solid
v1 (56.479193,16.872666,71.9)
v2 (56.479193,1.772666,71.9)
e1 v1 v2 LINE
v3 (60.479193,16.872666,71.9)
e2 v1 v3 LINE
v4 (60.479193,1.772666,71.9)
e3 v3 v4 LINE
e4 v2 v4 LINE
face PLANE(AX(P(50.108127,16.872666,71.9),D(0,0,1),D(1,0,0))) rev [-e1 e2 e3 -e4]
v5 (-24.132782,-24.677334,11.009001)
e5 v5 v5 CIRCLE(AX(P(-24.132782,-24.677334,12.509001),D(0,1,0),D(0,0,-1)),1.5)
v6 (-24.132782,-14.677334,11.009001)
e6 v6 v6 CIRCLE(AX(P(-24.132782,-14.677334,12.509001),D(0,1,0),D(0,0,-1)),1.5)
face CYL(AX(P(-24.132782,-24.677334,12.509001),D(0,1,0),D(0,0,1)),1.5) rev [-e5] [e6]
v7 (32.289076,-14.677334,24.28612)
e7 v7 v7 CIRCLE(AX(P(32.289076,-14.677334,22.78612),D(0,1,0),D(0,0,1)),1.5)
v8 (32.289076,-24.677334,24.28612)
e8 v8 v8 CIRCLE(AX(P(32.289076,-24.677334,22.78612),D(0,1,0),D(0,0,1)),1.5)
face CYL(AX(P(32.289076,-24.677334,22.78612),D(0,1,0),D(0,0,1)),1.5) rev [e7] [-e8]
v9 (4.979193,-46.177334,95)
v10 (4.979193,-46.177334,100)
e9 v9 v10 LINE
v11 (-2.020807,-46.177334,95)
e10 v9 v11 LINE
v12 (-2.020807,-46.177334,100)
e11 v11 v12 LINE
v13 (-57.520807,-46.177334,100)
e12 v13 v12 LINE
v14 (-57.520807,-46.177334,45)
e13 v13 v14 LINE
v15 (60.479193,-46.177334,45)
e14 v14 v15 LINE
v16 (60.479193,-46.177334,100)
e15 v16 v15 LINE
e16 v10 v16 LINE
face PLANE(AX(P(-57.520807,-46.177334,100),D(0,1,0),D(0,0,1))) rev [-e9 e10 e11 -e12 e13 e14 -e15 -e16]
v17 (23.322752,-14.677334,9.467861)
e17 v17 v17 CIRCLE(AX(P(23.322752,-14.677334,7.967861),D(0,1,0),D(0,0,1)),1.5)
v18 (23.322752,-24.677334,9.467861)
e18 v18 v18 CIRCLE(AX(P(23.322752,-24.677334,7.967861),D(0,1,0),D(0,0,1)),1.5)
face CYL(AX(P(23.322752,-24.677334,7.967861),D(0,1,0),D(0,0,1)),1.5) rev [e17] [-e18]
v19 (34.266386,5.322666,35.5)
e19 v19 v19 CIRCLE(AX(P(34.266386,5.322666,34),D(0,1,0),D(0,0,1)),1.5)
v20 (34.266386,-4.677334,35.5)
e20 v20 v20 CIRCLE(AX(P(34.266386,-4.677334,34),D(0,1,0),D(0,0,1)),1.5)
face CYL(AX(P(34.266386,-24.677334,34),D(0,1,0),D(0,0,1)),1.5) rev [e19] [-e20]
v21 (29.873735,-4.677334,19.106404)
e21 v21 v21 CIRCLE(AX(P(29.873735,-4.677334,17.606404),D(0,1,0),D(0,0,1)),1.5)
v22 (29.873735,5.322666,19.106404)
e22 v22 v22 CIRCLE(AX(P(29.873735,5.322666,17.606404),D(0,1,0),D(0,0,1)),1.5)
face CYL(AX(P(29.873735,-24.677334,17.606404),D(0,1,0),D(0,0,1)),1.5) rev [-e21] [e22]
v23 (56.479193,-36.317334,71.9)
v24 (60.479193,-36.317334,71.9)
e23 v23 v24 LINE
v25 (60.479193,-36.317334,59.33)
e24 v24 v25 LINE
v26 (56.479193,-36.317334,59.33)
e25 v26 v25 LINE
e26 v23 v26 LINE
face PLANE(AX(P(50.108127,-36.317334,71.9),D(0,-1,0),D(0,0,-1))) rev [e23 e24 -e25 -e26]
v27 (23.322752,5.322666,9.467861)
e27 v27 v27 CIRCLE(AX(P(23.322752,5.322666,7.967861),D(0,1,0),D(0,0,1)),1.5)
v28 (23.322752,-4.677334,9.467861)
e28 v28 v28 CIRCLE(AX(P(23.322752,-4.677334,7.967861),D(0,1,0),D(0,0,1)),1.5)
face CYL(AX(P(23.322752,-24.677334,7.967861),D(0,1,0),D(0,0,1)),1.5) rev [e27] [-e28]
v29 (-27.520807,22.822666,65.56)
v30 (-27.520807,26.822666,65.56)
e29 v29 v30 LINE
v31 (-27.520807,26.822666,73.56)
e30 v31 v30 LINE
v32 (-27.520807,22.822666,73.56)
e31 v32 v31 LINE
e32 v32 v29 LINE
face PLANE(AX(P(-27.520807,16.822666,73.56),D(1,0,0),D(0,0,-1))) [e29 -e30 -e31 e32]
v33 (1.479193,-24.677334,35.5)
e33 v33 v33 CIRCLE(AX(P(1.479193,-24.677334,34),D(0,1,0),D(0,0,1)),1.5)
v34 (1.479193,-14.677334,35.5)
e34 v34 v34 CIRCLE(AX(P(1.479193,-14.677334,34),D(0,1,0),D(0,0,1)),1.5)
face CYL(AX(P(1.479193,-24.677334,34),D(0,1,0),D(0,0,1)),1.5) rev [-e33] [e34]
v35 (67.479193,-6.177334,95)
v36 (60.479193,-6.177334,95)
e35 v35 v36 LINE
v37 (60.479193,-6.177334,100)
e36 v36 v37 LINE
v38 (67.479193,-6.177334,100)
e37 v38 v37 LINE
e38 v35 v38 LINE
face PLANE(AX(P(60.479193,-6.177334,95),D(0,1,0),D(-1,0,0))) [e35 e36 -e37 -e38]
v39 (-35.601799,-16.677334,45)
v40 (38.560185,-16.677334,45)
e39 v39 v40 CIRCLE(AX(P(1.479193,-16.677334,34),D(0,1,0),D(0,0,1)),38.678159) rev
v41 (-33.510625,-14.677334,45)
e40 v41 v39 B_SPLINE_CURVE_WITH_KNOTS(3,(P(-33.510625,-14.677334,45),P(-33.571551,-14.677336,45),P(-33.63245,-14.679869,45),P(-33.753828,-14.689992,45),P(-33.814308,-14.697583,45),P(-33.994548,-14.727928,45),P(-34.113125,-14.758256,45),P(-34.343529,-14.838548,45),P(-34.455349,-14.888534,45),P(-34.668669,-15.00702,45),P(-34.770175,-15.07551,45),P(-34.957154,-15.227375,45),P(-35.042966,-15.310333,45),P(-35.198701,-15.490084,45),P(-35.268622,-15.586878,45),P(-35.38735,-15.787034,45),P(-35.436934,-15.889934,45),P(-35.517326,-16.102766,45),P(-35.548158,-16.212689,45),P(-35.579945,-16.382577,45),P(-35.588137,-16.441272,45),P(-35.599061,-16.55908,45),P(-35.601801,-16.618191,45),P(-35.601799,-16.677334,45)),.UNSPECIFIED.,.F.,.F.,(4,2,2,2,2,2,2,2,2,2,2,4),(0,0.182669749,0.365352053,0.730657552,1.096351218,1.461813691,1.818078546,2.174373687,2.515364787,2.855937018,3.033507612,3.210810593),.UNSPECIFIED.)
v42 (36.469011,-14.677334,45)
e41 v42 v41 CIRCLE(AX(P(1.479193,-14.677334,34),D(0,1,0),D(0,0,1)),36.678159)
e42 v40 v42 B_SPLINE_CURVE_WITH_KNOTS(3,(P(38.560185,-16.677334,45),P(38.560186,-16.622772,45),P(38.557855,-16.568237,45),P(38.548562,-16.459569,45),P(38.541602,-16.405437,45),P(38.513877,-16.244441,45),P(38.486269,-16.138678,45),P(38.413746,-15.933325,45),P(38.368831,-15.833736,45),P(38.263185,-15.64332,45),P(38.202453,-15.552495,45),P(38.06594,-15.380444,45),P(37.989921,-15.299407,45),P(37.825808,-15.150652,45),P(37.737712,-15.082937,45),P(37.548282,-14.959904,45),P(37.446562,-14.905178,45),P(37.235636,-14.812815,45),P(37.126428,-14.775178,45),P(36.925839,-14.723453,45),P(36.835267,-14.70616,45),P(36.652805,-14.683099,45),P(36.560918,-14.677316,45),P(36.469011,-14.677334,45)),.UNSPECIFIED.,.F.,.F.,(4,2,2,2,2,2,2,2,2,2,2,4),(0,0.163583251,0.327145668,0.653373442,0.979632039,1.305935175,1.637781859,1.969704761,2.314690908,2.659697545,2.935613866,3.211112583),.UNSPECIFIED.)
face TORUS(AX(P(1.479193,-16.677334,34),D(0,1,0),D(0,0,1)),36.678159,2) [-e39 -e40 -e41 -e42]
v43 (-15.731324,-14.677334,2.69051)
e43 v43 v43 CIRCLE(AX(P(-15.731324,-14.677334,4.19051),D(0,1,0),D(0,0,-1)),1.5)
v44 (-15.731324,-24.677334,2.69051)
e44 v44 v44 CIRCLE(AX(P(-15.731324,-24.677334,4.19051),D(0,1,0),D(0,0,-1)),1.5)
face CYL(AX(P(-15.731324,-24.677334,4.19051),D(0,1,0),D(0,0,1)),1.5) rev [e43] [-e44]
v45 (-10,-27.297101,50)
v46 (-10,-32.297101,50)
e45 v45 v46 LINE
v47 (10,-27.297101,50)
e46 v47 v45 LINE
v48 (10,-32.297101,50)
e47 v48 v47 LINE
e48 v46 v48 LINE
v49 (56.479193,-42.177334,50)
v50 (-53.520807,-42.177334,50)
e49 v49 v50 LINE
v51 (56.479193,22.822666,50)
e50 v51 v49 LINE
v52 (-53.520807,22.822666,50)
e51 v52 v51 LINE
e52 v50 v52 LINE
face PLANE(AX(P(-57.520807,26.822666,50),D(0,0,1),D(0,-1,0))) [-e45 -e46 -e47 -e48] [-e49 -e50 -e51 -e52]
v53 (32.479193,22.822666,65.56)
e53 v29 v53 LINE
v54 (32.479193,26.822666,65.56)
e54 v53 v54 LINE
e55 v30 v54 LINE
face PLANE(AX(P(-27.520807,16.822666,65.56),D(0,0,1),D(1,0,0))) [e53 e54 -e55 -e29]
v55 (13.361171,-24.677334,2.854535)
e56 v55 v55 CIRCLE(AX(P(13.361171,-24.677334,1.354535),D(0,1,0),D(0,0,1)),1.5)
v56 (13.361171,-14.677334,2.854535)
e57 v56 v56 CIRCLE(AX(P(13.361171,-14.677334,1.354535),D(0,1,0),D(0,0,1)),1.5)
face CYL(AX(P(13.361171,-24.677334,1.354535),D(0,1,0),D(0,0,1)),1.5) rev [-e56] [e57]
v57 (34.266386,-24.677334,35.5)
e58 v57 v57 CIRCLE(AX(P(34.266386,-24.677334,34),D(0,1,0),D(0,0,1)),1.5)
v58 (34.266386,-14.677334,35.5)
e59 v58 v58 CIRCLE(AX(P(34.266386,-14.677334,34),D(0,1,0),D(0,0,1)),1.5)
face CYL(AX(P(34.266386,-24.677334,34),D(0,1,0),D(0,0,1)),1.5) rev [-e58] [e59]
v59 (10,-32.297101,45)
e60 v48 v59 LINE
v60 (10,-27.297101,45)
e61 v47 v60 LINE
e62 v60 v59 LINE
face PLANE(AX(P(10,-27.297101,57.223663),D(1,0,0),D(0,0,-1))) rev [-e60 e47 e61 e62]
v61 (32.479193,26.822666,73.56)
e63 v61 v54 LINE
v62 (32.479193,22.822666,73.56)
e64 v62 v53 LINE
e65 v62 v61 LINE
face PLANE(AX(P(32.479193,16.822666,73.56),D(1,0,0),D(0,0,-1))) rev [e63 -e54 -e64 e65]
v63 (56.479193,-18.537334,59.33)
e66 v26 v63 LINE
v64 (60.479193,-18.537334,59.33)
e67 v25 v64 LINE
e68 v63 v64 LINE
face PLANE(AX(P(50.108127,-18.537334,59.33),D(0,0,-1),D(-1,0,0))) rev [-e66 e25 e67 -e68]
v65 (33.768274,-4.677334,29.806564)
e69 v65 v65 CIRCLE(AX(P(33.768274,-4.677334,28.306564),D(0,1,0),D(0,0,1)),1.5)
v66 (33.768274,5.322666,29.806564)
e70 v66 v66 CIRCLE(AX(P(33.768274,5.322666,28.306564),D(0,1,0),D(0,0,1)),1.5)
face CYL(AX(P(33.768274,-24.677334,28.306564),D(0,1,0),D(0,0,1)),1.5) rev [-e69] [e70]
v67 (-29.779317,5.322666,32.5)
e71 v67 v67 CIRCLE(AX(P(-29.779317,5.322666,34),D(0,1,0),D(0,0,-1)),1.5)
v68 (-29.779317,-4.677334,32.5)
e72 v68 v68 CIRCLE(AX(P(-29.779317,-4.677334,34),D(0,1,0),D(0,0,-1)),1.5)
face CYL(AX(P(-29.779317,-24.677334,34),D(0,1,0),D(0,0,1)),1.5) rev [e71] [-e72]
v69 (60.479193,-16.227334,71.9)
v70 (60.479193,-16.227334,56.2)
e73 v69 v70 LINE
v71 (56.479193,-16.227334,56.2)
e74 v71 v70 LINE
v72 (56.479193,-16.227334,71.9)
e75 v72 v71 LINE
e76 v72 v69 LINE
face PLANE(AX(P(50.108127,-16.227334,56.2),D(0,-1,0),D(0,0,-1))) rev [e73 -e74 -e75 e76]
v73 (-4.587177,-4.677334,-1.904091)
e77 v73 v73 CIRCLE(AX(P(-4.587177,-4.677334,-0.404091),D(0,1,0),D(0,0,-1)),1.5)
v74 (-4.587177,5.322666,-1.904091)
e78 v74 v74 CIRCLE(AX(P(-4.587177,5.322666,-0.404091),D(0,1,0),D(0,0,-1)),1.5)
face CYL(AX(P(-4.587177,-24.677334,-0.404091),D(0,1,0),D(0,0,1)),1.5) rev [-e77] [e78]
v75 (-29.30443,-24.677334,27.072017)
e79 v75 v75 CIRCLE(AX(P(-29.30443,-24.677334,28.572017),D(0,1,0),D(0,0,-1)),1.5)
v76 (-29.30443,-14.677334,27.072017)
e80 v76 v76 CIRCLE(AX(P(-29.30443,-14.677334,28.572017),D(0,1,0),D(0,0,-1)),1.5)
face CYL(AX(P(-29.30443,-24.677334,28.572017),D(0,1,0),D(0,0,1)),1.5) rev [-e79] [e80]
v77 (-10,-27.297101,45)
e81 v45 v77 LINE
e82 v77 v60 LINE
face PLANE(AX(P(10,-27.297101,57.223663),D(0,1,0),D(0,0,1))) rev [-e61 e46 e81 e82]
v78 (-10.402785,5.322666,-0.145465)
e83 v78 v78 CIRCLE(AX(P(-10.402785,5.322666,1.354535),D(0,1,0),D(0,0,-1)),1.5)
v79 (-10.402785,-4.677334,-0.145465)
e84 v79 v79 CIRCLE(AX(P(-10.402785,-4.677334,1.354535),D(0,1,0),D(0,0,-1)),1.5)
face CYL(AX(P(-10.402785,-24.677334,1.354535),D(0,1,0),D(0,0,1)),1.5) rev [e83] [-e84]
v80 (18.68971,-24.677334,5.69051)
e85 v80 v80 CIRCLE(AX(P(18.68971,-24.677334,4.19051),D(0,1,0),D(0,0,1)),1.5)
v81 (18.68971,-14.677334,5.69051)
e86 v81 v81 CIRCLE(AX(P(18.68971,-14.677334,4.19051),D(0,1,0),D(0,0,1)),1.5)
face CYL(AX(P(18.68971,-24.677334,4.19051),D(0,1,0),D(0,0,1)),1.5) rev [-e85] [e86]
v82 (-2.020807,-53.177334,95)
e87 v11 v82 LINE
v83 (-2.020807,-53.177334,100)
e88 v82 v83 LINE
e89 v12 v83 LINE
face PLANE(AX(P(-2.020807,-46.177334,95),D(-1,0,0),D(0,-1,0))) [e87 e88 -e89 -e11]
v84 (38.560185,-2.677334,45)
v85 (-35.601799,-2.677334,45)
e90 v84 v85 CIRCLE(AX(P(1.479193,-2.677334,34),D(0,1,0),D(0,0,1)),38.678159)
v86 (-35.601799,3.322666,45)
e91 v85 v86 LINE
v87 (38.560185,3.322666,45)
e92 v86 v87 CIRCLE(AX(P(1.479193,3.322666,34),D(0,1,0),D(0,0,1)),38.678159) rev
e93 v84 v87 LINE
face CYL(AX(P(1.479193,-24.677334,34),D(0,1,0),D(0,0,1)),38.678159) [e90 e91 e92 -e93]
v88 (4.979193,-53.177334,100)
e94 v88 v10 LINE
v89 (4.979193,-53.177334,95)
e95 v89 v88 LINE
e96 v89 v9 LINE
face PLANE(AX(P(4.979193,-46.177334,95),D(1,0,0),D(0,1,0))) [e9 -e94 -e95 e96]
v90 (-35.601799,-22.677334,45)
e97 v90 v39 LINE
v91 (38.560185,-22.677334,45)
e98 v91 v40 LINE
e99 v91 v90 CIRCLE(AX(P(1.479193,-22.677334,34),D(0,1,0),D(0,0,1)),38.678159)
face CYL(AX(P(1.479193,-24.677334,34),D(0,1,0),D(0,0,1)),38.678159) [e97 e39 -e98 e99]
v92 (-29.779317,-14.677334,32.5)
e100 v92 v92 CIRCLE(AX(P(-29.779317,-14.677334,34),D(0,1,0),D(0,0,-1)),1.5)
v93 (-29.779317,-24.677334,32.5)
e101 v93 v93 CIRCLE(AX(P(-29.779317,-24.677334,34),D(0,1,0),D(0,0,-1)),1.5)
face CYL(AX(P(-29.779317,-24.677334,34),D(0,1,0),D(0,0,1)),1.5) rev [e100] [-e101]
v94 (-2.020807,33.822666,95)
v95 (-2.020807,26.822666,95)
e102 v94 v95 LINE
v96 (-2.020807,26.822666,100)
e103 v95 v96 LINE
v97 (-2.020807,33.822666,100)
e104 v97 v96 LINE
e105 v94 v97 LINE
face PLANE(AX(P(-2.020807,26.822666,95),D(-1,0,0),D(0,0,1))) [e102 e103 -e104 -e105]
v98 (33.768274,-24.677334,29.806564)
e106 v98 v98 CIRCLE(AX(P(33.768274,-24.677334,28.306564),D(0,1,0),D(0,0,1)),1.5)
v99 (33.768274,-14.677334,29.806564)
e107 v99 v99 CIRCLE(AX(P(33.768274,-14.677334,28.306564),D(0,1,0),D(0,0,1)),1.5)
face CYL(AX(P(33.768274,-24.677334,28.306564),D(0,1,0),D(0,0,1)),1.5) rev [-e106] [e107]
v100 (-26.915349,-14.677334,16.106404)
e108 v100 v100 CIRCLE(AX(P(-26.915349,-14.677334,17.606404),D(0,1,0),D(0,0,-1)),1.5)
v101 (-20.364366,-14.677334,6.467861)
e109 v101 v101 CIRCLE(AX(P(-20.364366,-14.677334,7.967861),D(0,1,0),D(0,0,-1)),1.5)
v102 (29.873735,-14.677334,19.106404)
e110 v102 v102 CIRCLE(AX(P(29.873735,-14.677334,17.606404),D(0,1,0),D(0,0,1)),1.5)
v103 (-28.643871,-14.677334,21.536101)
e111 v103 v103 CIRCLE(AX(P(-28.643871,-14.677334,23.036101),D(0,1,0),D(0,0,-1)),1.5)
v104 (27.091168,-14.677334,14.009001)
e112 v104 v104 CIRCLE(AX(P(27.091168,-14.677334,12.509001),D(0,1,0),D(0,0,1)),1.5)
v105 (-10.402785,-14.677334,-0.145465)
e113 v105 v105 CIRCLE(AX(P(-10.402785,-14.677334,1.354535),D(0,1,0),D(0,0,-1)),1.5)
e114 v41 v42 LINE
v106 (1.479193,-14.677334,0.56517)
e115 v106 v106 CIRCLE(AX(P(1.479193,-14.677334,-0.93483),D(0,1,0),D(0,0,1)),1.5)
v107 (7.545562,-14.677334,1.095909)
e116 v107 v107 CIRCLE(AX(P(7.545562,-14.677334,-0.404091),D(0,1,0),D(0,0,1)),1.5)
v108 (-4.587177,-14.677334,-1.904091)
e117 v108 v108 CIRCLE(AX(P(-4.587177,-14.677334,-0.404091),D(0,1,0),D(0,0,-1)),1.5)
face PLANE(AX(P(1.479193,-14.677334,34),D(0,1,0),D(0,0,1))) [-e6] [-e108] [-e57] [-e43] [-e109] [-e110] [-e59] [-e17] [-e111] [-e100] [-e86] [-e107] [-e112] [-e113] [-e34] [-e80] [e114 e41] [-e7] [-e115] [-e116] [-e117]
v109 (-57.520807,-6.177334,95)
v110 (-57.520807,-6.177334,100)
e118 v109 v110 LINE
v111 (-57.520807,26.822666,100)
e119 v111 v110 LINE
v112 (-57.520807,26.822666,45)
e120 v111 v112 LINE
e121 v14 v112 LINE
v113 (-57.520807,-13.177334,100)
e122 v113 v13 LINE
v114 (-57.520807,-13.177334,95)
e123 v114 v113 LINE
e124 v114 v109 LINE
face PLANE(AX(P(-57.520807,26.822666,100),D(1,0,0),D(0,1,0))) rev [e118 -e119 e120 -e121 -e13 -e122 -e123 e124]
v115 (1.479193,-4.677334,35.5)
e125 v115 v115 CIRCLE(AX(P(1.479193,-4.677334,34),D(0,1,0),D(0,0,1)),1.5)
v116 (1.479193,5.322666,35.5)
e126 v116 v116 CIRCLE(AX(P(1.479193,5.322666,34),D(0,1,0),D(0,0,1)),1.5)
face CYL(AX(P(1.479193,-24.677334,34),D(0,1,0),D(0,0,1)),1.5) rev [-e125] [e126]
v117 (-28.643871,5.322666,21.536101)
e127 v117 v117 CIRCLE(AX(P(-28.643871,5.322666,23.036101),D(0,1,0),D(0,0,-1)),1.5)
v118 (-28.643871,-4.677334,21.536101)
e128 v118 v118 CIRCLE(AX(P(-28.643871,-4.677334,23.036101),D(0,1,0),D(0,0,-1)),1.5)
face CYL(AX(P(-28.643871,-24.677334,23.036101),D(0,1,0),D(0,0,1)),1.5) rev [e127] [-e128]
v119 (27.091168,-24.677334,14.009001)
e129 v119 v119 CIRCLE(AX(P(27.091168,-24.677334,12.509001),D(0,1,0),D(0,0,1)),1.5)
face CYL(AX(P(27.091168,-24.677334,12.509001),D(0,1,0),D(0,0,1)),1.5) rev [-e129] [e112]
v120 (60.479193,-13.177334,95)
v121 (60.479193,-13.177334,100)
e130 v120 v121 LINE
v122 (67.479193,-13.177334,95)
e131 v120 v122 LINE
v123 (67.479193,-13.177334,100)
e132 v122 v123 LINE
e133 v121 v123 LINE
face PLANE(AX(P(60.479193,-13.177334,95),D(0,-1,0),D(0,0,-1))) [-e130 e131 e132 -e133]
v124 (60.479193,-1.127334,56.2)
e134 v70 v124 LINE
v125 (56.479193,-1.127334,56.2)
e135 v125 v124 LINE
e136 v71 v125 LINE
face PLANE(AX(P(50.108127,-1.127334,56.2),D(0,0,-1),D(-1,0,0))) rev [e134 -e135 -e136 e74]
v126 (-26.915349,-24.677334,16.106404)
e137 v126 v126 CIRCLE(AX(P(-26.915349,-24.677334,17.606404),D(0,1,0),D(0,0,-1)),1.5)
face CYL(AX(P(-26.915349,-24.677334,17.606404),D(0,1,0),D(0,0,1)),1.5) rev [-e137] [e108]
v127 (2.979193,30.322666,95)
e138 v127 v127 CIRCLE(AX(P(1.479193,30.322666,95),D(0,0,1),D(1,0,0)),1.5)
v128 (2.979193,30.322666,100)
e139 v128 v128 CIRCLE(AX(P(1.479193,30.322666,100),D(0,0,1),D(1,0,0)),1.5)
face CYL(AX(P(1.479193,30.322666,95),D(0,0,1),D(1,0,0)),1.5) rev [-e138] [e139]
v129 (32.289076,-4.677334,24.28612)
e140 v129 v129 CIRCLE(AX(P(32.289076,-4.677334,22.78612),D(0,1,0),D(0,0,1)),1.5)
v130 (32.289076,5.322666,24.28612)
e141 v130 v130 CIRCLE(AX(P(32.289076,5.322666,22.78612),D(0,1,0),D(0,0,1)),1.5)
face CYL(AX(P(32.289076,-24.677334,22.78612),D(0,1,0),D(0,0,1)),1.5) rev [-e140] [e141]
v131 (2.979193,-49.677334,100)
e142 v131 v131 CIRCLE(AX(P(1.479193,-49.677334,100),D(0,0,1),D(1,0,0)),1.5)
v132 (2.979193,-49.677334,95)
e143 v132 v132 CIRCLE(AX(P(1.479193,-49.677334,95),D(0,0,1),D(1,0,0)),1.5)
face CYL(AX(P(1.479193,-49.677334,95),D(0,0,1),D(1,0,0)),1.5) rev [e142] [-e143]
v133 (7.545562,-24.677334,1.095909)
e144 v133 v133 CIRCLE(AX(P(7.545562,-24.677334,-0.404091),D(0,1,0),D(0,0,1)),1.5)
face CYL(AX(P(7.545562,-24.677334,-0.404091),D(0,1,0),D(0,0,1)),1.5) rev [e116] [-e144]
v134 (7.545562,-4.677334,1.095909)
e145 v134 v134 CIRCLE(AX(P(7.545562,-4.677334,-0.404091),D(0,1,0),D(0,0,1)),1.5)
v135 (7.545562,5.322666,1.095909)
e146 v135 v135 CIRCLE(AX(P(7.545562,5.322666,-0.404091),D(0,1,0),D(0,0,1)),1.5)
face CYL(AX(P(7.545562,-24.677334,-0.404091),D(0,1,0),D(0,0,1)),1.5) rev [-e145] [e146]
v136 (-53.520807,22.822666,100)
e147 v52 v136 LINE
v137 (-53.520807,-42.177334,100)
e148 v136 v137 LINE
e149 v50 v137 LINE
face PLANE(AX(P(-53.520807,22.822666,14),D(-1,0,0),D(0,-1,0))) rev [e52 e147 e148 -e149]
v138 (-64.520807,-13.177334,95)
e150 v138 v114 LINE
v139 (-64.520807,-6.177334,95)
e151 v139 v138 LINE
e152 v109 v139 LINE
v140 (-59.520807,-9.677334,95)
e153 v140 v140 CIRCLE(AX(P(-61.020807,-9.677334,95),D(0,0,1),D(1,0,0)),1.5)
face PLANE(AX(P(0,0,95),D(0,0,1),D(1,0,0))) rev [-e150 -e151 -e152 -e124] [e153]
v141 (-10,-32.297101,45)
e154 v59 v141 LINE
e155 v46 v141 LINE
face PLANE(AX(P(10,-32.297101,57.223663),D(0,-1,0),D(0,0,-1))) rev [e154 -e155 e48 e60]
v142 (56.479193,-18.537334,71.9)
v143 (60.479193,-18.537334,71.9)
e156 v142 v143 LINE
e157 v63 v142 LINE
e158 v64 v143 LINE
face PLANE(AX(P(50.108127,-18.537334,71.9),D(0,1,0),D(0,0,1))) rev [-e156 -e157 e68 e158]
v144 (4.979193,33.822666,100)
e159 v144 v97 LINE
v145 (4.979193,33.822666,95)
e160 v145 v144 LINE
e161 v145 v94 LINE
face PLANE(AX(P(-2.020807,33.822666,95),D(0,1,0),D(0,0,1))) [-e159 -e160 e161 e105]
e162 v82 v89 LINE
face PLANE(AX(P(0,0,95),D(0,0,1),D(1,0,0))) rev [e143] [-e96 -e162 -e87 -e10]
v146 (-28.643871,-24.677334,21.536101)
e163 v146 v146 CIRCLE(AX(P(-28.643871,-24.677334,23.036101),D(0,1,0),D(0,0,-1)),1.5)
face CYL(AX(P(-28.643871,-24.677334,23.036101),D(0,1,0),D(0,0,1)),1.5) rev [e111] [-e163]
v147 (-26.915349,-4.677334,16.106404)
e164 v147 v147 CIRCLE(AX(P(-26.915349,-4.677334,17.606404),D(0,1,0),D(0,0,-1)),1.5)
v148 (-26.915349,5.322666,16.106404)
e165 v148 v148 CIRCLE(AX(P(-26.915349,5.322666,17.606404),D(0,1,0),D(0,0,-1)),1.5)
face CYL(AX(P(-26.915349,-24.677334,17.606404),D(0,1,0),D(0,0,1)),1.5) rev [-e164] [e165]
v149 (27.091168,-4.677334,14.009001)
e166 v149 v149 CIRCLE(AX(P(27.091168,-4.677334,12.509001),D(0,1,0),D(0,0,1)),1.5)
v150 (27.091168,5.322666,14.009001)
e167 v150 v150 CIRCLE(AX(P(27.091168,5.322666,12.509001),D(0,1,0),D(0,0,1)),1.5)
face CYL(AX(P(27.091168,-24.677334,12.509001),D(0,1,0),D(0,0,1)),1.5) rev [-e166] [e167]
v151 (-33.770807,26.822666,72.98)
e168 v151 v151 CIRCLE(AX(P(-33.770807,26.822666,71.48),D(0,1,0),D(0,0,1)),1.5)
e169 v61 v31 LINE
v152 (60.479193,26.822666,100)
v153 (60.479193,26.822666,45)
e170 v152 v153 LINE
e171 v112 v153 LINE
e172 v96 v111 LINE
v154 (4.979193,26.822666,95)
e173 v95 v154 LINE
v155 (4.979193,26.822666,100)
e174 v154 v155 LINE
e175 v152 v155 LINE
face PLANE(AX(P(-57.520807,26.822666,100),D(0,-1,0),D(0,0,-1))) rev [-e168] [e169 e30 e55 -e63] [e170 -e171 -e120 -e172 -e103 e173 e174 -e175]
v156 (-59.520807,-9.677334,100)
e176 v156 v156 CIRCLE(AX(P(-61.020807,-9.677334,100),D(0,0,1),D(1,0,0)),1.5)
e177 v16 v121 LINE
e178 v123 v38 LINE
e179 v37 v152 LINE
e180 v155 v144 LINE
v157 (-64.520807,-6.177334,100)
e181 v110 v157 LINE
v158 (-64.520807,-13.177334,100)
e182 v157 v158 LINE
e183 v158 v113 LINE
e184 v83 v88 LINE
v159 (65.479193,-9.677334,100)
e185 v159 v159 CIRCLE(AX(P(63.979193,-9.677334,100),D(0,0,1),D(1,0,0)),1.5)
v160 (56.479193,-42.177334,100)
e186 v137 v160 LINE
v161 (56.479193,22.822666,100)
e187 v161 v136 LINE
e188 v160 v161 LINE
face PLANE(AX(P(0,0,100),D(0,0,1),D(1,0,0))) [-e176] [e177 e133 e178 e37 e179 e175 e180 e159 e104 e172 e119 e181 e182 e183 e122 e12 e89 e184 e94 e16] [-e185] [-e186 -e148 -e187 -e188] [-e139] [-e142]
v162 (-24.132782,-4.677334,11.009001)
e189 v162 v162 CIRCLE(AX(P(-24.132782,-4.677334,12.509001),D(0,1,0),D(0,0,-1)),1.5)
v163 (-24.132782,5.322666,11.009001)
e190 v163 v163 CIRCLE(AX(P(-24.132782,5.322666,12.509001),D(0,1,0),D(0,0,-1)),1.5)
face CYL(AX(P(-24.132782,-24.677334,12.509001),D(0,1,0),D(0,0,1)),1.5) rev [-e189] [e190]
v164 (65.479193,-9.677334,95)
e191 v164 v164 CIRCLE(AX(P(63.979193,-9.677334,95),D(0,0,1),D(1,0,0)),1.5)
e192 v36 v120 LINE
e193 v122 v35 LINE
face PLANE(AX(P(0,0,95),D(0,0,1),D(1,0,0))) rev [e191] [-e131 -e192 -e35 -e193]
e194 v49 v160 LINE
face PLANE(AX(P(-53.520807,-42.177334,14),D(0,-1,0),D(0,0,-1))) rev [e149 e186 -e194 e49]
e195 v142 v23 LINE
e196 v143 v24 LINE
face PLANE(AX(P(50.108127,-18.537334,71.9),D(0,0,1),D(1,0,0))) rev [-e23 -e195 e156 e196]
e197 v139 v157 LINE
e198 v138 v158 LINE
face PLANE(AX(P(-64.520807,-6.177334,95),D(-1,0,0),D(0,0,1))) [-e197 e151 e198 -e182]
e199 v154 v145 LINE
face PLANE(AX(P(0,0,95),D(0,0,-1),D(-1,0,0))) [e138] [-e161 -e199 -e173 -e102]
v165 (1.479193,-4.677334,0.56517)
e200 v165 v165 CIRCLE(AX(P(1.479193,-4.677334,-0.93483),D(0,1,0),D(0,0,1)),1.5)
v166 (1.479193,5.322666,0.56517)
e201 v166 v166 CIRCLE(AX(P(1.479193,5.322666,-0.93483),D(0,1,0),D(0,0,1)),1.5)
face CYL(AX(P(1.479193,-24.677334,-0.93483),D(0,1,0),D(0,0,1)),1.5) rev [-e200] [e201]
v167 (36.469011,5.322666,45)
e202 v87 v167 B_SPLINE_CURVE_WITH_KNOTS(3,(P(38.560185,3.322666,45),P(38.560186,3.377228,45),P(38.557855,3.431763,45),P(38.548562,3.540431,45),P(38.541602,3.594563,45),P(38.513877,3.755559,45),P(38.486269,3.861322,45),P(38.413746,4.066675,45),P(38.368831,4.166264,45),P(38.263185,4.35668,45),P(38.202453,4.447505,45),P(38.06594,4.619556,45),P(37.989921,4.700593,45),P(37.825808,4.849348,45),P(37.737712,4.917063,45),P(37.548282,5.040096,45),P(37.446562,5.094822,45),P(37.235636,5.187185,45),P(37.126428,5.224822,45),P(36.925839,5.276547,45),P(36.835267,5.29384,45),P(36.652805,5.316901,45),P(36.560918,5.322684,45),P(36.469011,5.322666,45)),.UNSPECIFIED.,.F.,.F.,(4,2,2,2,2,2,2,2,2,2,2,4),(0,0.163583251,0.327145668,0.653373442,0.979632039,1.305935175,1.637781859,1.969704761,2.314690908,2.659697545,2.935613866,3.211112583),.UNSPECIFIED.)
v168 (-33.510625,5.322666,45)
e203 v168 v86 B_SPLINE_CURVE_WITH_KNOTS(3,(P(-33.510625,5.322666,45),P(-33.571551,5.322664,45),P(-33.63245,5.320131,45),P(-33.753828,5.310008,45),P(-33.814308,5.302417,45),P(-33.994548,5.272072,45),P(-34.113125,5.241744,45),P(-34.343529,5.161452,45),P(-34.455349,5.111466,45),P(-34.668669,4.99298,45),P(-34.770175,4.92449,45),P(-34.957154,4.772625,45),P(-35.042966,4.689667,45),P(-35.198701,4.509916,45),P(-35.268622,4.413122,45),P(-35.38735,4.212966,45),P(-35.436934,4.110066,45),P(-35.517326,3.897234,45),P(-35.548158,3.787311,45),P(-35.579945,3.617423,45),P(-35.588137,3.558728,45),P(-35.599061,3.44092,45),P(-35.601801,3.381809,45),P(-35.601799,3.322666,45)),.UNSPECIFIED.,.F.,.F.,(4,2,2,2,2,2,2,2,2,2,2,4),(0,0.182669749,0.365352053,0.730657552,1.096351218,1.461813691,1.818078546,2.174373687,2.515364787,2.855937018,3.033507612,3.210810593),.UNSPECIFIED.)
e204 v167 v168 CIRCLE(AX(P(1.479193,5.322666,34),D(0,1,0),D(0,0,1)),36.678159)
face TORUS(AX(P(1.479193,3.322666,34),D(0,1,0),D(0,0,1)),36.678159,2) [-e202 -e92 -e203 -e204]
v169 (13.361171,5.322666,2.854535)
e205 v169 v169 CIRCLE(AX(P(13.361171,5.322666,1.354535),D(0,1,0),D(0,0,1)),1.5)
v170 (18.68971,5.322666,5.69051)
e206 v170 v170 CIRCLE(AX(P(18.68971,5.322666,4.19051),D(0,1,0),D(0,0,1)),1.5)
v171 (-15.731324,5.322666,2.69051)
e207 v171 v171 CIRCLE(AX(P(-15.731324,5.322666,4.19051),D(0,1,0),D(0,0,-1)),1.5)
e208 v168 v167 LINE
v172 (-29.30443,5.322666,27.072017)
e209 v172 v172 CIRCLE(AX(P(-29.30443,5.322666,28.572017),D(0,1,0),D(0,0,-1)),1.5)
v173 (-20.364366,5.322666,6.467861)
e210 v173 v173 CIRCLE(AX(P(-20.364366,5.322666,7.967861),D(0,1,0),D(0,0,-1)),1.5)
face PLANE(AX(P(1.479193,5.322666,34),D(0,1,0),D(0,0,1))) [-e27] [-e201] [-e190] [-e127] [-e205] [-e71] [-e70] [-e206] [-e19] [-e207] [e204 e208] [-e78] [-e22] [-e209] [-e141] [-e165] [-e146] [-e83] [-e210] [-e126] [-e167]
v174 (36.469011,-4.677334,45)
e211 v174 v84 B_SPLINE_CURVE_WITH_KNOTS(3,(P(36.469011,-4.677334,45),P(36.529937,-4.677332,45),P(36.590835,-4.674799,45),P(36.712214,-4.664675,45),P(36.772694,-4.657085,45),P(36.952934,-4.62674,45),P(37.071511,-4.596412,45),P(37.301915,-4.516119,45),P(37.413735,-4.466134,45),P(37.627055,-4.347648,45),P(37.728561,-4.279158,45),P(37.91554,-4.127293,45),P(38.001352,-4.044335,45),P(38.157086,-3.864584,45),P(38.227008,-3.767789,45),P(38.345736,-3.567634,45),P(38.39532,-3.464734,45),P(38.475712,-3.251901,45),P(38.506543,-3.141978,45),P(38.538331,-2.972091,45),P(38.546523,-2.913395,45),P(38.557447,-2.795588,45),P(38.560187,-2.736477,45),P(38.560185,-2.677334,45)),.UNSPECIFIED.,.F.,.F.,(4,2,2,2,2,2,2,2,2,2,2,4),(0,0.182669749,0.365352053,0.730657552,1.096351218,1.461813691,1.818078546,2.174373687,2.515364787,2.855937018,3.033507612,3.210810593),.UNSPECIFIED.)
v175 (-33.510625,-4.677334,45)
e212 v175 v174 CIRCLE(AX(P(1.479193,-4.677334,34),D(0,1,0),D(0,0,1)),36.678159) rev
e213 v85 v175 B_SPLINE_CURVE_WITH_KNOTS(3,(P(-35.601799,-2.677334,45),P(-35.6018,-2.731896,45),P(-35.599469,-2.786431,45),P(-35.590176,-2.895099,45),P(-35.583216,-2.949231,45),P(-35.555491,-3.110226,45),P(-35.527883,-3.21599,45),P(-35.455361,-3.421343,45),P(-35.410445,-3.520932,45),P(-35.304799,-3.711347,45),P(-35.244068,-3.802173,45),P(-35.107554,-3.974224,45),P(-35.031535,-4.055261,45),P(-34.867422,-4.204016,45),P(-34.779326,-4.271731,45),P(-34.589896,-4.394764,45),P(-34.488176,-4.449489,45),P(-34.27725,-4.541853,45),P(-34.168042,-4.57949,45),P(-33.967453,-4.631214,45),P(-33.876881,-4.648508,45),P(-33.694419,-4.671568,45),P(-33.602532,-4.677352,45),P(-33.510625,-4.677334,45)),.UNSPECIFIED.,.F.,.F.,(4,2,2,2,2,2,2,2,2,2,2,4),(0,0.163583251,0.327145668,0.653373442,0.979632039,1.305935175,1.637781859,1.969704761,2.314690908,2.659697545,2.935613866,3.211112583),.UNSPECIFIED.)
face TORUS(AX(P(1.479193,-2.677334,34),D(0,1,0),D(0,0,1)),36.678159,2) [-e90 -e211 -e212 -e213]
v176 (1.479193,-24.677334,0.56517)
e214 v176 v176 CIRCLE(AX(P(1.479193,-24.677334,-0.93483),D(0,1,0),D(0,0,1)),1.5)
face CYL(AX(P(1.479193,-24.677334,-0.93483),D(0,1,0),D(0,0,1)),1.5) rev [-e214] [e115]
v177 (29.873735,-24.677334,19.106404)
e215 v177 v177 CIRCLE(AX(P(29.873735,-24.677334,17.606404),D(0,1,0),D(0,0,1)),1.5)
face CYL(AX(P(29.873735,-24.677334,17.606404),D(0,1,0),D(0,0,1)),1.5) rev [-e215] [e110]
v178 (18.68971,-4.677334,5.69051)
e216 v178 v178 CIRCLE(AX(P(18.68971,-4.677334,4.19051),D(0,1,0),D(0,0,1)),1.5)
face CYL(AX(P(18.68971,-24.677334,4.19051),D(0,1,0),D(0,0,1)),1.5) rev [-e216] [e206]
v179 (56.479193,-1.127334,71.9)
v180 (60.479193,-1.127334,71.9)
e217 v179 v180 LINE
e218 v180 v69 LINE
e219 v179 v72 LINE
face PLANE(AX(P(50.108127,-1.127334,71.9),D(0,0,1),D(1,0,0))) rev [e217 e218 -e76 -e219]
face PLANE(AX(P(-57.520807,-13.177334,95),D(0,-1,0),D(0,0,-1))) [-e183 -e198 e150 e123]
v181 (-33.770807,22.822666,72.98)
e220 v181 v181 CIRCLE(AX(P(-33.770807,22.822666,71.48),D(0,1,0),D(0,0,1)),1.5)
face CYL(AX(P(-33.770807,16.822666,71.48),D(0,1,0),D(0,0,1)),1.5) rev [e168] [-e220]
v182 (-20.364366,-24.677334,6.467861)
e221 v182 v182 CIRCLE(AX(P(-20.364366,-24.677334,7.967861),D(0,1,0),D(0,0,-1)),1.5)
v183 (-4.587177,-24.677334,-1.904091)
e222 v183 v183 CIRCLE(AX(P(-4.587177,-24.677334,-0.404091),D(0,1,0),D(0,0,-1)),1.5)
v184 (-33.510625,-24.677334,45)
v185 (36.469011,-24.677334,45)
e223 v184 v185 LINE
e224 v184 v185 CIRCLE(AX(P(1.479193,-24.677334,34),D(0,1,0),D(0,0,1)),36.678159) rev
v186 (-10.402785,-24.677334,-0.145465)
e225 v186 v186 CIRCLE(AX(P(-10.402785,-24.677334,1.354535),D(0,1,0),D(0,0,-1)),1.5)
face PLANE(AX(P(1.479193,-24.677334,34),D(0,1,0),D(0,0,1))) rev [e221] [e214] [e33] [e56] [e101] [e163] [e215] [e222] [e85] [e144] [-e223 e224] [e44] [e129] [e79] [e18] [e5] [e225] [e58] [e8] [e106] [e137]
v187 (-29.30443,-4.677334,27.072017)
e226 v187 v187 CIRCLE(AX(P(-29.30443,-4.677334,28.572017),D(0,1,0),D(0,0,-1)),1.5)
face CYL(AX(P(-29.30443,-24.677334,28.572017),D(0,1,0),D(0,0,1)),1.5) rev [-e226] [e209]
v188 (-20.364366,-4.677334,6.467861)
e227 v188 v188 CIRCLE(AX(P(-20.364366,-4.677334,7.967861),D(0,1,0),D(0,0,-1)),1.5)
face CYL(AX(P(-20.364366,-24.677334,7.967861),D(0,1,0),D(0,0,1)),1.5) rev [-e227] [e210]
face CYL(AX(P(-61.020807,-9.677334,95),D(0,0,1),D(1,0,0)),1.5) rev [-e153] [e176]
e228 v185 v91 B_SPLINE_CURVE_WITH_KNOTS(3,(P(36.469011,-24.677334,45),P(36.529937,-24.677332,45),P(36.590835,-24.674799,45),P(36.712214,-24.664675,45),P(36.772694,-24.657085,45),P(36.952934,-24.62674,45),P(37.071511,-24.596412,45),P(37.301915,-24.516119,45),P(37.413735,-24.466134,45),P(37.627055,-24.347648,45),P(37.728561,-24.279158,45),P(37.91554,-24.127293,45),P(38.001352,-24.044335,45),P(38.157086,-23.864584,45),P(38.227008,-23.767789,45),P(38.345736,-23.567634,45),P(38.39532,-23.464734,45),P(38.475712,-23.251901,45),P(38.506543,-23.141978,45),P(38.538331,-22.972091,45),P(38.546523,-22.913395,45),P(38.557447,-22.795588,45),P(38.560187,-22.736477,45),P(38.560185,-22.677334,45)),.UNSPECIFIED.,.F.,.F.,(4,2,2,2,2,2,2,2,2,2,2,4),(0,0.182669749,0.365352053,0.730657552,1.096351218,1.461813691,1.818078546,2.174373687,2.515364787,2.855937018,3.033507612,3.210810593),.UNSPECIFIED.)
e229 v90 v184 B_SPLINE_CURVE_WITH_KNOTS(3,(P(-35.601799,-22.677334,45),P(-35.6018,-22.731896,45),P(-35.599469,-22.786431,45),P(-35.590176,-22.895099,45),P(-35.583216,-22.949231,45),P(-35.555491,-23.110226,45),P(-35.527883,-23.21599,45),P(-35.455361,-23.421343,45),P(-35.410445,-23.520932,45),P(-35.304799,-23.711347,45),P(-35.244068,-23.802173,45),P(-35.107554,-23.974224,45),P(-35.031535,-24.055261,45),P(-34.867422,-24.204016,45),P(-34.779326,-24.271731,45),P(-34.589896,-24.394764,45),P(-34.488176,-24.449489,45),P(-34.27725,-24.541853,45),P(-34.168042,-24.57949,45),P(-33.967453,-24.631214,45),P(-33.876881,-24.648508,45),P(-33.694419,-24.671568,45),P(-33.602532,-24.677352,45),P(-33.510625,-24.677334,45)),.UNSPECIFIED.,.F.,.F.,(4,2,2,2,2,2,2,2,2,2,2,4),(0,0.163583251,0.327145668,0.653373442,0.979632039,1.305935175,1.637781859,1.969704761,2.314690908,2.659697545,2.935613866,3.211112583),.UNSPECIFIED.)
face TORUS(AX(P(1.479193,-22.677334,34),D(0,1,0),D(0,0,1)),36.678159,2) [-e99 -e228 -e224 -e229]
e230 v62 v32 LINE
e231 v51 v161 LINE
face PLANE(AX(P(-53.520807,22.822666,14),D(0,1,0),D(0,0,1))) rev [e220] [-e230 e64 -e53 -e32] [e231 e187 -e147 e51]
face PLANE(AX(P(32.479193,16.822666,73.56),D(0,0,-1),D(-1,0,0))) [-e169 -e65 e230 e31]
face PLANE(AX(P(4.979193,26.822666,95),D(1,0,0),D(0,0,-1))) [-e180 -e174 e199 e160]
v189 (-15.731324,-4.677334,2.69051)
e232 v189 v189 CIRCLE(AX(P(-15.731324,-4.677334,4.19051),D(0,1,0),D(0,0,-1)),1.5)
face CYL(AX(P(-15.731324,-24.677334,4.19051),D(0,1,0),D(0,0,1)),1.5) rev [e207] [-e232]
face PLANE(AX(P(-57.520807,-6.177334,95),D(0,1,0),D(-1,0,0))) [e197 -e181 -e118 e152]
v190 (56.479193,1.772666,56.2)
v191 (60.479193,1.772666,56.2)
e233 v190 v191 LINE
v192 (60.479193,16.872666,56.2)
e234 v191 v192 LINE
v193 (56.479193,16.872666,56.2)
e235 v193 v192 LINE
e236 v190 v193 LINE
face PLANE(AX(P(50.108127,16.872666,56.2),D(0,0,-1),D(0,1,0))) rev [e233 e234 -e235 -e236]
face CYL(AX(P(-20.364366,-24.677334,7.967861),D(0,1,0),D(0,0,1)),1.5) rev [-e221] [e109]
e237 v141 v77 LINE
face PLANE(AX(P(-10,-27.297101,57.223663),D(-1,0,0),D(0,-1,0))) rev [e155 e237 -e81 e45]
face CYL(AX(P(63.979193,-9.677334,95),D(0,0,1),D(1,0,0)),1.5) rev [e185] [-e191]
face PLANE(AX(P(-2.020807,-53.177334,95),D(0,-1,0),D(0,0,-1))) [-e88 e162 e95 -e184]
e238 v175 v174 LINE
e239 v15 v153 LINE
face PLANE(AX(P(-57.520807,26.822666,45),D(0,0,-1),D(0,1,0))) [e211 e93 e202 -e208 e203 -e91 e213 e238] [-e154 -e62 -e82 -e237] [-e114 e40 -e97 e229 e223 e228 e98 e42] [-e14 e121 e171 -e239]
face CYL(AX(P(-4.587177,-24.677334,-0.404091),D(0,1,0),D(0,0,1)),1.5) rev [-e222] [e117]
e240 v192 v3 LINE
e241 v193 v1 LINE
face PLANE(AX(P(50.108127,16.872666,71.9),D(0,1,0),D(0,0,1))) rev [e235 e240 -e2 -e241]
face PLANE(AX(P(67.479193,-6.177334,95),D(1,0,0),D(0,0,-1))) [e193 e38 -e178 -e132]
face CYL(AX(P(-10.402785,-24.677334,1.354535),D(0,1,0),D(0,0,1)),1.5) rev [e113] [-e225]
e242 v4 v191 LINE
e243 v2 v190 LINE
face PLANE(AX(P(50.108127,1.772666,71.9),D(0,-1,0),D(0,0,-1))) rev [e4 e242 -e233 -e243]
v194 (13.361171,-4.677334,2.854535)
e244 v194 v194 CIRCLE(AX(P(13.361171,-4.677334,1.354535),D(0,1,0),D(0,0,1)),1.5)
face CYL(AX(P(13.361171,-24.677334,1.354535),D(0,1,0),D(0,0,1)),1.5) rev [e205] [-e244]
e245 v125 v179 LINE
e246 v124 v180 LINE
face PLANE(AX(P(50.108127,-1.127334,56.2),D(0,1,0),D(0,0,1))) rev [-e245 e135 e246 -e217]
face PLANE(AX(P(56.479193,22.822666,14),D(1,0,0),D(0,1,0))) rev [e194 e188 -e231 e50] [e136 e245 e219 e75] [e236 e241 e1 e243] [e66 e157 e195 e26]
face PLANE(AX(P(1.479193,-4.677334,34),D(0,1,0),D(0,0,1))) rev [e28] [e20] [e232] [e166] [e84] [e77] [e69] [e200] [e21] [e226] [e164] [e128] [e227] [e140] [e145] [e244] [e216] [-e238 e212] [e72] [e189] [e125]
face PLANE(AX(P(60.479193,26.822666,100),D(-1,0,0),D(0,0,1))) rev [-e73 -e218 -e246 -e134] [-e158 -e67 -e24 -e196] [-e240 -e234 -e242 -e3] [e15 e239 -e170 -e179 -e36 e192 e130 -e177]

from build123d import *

# Parameters (mm, degrees)
CROQUIS1_W                    = 118
CROQUIS1_H                    = 73
SALIENTE_EXTRUIR1_DEPTH       = 100
SALIENTE_EXTRUIR2_START       = -86
SALIENTE_EXTRUIR2_OUTLINE_W   = 110
SALIENTE_EXTRUIR2_OUTLINE_H   = 65
SALIENTE_EXTRUIR2_DEPTH       = 86
SALIENTE_EXTRUIR3_START       = -9.489193536
SALIENTE_EXTRUIR3_OUTLINE_R   = 1.5
SALIENTE_EXTRUIR3_OUTLINE_R_2 = 11
SALIENTE_EXTRUIR3_DEPTH       = 9.489193536
CROQUIS4_W                    = 7
CROQUIS4_H                    = 7
CROQUIS4_R                    = 1.5
SALIENTE_EXTRUIR4_DEPTH       = 5
SALIENTE_EXTRUIR5_START       = -4
SALIENTE_EXTRUIR5_OUTLINE_W   = 12.57
SALIENTE_EXTRUIR5_OUTLINE_H   = 17.78
SALIENTE_EXTRUIR5_OUTLINE_W_2 = 15.7
SALIENTE_EXTRUIR5_OUTLINE_H_2 = 15.1
SALIENTE_EXTRUIR5_DEPTH       = 4
CROQUIS7_R                    = 1.5
CROQUIS7_W                    = 60
CROQUIS7_H                    = 8
CORTAR_EXTRUIR1_DEPTH         = 10
CROQUIS13_W                   = 50
CROQUIS13_H                   = 73
CORTAR_EXTRUIR3_DEPTH         = 135
CROQUIS14_W                   = 5
CROQUIS14_H                   = 73
SALIENTE_EXTRUIR8_DEPTH       = 118
SALIENTE_EXTRUIR9_DEPTH       = 15
SALIENTE_EXTRUIR9_DEPTH_BACK  = 15
CROQUIS16_R                   = 1.5
CORTAR_EXTRUIR4_DEPTH         = 5
CORTAR_EXTRUIR4_DEPTH_BACK    = 5
CROQUIS16_3_R                 = 1.5
REDONDEO4_R                   = 2
SALIENTE_EXTRUIR10_START      = -5
SALIENTE_EXTRUIR10_OUTLINE_W  = 20
SALIENTE_EXTRUIR10_OUTLINE_H  = 5
SALIENTE_EXTRUIR10_DEPTH      = 5


# Read off the part's stored shape, not the designer's step: Saliente-Extruir2, Saliente-Extruir3, Saliente-Extruir5, Saliente-Extruir10
with BuildPart() as part:
    # Croquis1 → Saliente-Extruir1 (new body)
    with BuildSketch(Plane(origin=(0, 6.22367504, 0), x_dir=(1, 0, 0), z_dir=(0, 0, 1))):
        with Locations((1.479192938, -15.901008827)):
            Rectangle(CROQUIS1_W, CROQUIS1_H)
    extrude(amount=SALIENTE_EXTRUIR1_DEPTH)

    # Saliente-Extruir2 outline → Saliente-Extruir2 (cut)
    with BuildSketch(Plane(origin=(0, 6.22367504, 100), x_dir=(1, 0, 0), z_dir=(0, 0, 1)).offset(SALIENTE_EXTRUIR2_START)):
        with Locations((1.479192938, -15.901008827)):
            Rectangle(SALIENTE_EXTRUIR2_OUTLINE_W, SALIENTE_EXTRUIR2_OUTLINE_H)
    extrude(amount=SALIENTE_EXTRUIR2_DEPTH, mode=Mode.SUBTRACT)

    # Saliente-Extruir3 outline → Saliente-Extruir3 (cut)
    with BuildSketch(Plane(origin=(0, 6.22367504, 0), x_dir=(-1, 0, 0), z_dir=(0, 0, -1)).offset(SALIENTE_EXTRUIR3_START)):
        with Locations((-16.979192938, -0.401008827)):
            Circle(SALIENTE_EXTRUIR3_OUTLINE_R)
        with Locations((14.020807062, -0.401008827)):
            Circle(SALIENTE_EXTRUIR3_OUTLINE_R)
        with Locations((-1.479192938, -15.901008827)):
            Circle(SALIENTE_EXTRUIR3_OUTLINE_R_2)
        with Locations((14.020807062, -31.401008827)):
            Circle(SALIENTE_EXTRUIR3_OUTLINE_R)
        with Locations((-16.979192938, -31.401008827)):
            Circle(SALIENTE_EXTRUIR3_OUTLINE_R)
    extrude(amount=SALIENTE_EXTRUIR3_DEPTH, mode=Mode.SUBTRACT)

    # Croquis4 → Saliente-Extruir4 (add)
    # profile 1 of 4: a face of its own
    with BuildSketch(Plane(origin=(0, 6.22367504, 100), x_dir=(1, 0, 0), z_dir=(0, 0, 1))):
        with Locations((1.479192938, 24.098991173)):
            Rectangle(CROQUIS4_W, CROQUIS4_H)
        with Locations((1.479192938, 24.098991173)):
            Circle(CROQUIS4_R, mode=Mode.SUBTRACT)
    # profile 2 of 4: a face of its own
    with BuildSketch(Plane(origin=(0, 6.22367504, 100), x_dir=(1, 0, 0), z_dir=(0, 0, 1))):
        with Locations((-61.020807062, -15.901008827)):
            Rectangle(CROQUIS4_W, CROQUIS4_H)
        with Locations((-61.020807062, -15.901008827)):
            Circle(CROQUIS4_R, mode=Mode.SUBTRACT)
    # profile 3 of 4: a face of its own
    with BuildSketch(Plane(origin=(0, 6.22367504, 100), x_dir=(1, 0, 0), z_dir=(0, 0, 1))):
        with Locations((1.479192938, -55.901008827)):
            Rectangle(CROQUIS4_W, CROQUIS4_H)
        with Locations((1.479192938, -55.901008827)):
            Circle(CROQUIS4_R, mode=Mode.SUBTRACT)
    # profile 4 of 4: a face of its own
    with BuildSketch(Plane(origin=(0, 6.22367504, 100), x_dir=(1, 0, 0), z_dir=(0, 0, 1))):
        with Locations((63.979192938, -15.901008827)):
            Rectangle(CROQUIS4_W, CROQUIS4_H)
        with Locations((63.979192938, -15.901008827)):
            Circle(CROQUIS4_R, mode=Mode.SUBTRACT)
    extrude(amount=-SALIENTE_EXTRUIR4_DEPTH)

    # Saliente-Extruir5 outline → Saliente-Extruir5 (cut)
    with BuildSketch(Plane(origin=(60.479192938, 6.22367504, 0), x_dir=(0, 0, -1), z_dir=(1, 0, 0)).offset(SALIENTE_EXTRUIR5_START)):
        with Locations((-65.615, -33.651008827)):
            Rectangle(SALIENTE_EXTRUIR5_OUTLINE_W, SALIENTE_EXTRUIR5_OUTLINE_H)
        with Locations((-64.05, -14.901008827)):
            Rectangle(SALIENTE_EXTRUIR5_OUTLINE_W_2, SALIENTE_EXTRUIR5_OUTLINE_H_2)
        with Locations((-64.05, 3.098991173)):
            Rectangle(SALIENTE_EXTRUIR5_OUTLINE_W_2, SALIENTE_EXTRUIR5_OUTLINE_H_2)
    extrude(amount=SALIENTE_EXTRUIR5_DEPTH, mode=Mode.SUBTRACT)

    # Croquis7 → Cortar-Extruir1 (cut)
    with BuildSketch(Plane(origin=(0, 26.822666212, 0), x_dir=(1, 0, 0), z_dir=(0, 1, 0))):
        with Locations(Location((-33.770807062, -71.48, 0), (0, 0, 270))):
            Circle(CROQUIS7_R)
        with Locations((2.479192938, -69.56)):
            Rectangle(CROQUIS7_W, CROQUIS7_H)
    extrude(amount=-CORTAR_EXTRUIR1_DEPTH, mode=Mode.SUBTRACT)

    # Croquis13 → Cortar-Extruir3 (cut)
    with BuildSketch(Plane(origin=(60.479192938, 6.22367504, 0), x_dir=(0, 0, -1), z_dir=(1, 0, 0))):
        with Locations((-25, -15.901008827)):
            Rectangle(CROQUIS13_W, CROQUIS13_H)
    extrude(amount=-CORTAR_EXTRUIR3_DEPTH, mode=Mode.SUBTRACT)

    # Croquis14 → Saliente-Extruir8 (add)
    with BuildSketch(Plane(origin=(60.479192938, 6.22367504, 0), x_dir=(0, 0, -1), z_dir=(1, 0, 0))):
        with Locations((-47.5, -15.901008827)):
            Rectangle(CROQUIS14_W, CROQUIS14_H)
    extrude(amount=-SALIENTE_EXTRUIR8_DEPTH)

    # Croquis16 → Saliente-Extruir9 (add, two sides: drawn at the far end of the back side and taken through both)
    with BuildSketch(Plane(origin=(0, -9.677333788, 0), x_dir=(1, 0, 0), z_dir=(0, 1, 0)).offset(-SALIENTE_EXTRUIR9_DEPTH_BACK)):
        with BuildLine():
            Line((-35.601799497, -45), (38.560185374, -45))
            ThreePointArc((38.560185374, -45), (1.479192938, 4.678159212), (-35.601799497, -45))
        make_face()
        with Locations(Location((1.479192938, -34, 0), (0, 0, 270))):
            Circle(CROQUIS16_R, mode=Mode.SUBTRACT)
        with Locations(Location((34.26638556, -34, 0), (0, 0, 270))):
            Circle(CROQUIS16_R, mode=Mode.SUBTRACT)
        with Locations(Location((33.768274431, -28.30656375, 0), (0, 0, 270))):
            Circle(CROQUIS16_R, mode=Mode.SUBTRACT)
        with Locations(Location((32.289075901, -22.78611968, 0), (0, 0, 270))):
            Circle(CROQUIS16_R, mode=Mode.SUBTRACT)
        with Locations(Location((29.873734667, -17.606403689, 0), (0, 0, 270))):
            Circle(CROQUIS16_R, mode=Mode.SUBTRACT)
        with Locations(Location((27.091167836, -12.509001309, 0), (0, 0, 270))):
            Circle(CROQUIS16_R, mode=Mode.SUBTRACT)
        with Locations(Location((23.32275151, -7.967860597, 0), (0, 0, 270))):
            Circle(CROQUIS16_R, mode=Mode.SUBTRACT)
        with Locations(Location((18.689710225, -4.190509634, 0), (0, 0, 270))):
            Circle(CROQUIS16_R, mode=Mode.SUBTRACT)
        with Locations(Location((13.361170535, -1.354534854, 0), (0, 0, 270))):
            Circle(CROQUIS16_R, mode=Mode.SUBTRACT)
        with Locations(Location((7.545562452, 0.404091135, 0), (0, 0, 270))):
            Circle(CROQUIS16_R, mode=Mode.SUBTRACT)
        with Locations(Location((1.479192938, 0.934829696, 0), (0, 0, 270))):
            Circle(CROQUIS16_R, mode=Mode.SUBTRACT)
        with Locations(Location((-29.779317156, -34, 0), (0, 0, 90))):
            Circle(CROQUIS16_R, mode=Mode.SUBTRACT)
        with Locations(Location((-29.30443015, -28.572016686, 0), (0, 0, 90))):
            Circle(CROQUIS16_R, mode=Mode.SUBTRACT)
        with Locations(Location((-28.643870833, -23.036101422, 0), (0, 0, 90))):
            Circle(CROQUIS16_R, mode=Mode.SUBTRACT)
        with Locations(Location((-26.915348791, -17.606403689, 0), (0, 0, 90))):
            Circle(CROQUIS16_R, mode=Mode.SUBTRACT)
        with Locations(Location((-24.13278196, -12.509001309, 0), (0, 0, 90))):
            Circle(CROQUIS16_R, mode=Mode.SUBTRACT)
        with Locations(Location((-20.364365633, -7.967860597, 0), (0, 0, 90))):
            Circle(CROQUIS16_R, mode=Mode.SUBTRACT)
        with Locations(Location((-15.731324349, -4.190509634, 0), (0, 0, 90))):
            Circle(CROQUIS16_R, mode=Mode.SUBTRACT)
        with Locations(Location((-10.402784659, -1.354534854, 0), (0, 0, 90))):
            Circle(CROQUIS16_R, mode=Mode.SUBTRACT)
        with Locations(Location((-4.587176576, 0.404091135, 0), (0, 0, 90))):
            Circle(CROQUIS16_R, mode=Mode.SUBTRACT)
    extrude(amount=SALIENTE_EXTRUIR9_DEPTH + SALIENTE_EXTRUIR9_DEPTH_BACK)

    # Croquis16<3> → Cortar-Extruir4 (cut, two sides: drawn at the far end of the back side and taken through both)
    with BuildSketch(Plane(origin=(0, -9.677333788, 0), x_dir=(1, 0, 0), z_dir=(0, 1, 0)).offset(-CORTAR_EXTRUIR4_DEPTH_BACK)):
        with BuildLine():
            Line((-35.601799497, -45), (38.560185374, -45))
            ThreePointArc((38.560185374, -45), (1.479192938, 4.678159212), (-35.601799497, -45))
        make_face()
        with Locations(Location((1.479192938, -34, 0), (0, 0, 270))):
            Circle(CROQUIS16_3_R, mode=Mode.SUBTRACT)
        with Locations(Location((34.26638556, -34, 0), (0, 0, 270))):
            Circle(CROQUIS16_3_R, mode=Mode.SUBTRACT)
        with Locations(Location((33.768274431, -28.30656375, 0), (0, 0, 270))):
            Circle(CROQUIS16_3_R, mode=Mode.SUBTRACT)
        with Locations(Location((32.289075901, -22.78611968, 0), (0, 0, 270))):
            Circle(CROQUIS16_3_R, mode=Mode.SUBTRACT)
        with Locations(Location((29.873734667, -17.606403689, 0), (0, 0, 270))):
            Circle(CROQUIS16_3_R, mode=Mode.SUBTRACT)
        with Locations(Location((27.091167836, -12.509001309, 0), (0, 0, 270))):
            Circle(CROQUIS16_3_R, mode=Mode.SUBTRACT)
        with Locations(Location((23.32275151, -7.967860597, 0), (0, 0, 270))):
            Circle(CROQUIS16_3_R, mode=Mode.SUBTRACT)
        with Locations(Location((18.689710225, -4.190509634, 0), (0, 0, 270))):
            Circle(CROQUIS16_3_R, mode=Mode.SUBTRACT)
        with Locations(Location((13.361170535, -1.354534854, 0), (0, 0, 270))):
            Circle(CROQUIS16_3_R, mode=Mode.SUBTRACT)
        with Locations(Location((7.545562452, 0.404091135, 0), (0, 0, 270))):
            Circle(CROQUIS16_3_R, mode=Mode.SUBTRACT)
        with Locations(Location((1.479192938, 0.934829696, 0), (0, 0, 270))):
            Circle(CROQUIS16_3_R, mode=Mode.SUBTRACT)
        with Locations(Location((-29.779317156, -34, 0), (0, 0, 90))):
            Circle(CROQUIS16_3_R, mode=Mode.SUBTRACT)
        with Locations(Location((-29.30443015, -28.572016686, 0), (0, 0, 90))):
            Circle(CROQUIS16_3_R, mode=Mode.SUBTRACT)
        with Locations(Location((-28.643870833, -23.036101422, 0), (0, 0, 90))):
            Circle(CROQUIS16_3_R, mode=Mode.SUBTRACT)
        with Locations(Location((-26.915348791, -17.606403689, 0), (0, 0, 90))):
            Circle(CROQUIS16_3_R, mode=Mode.SUBTRACT)
        with Locations(Location((-24.13278196, -12.509001309, 0), (0, 0, 90))):
            Circle(CROQUIS16_3_R, mode=Mode.SUBTRACT)
        with Locations(Location((-20.364365633, -7.967860597, 0), (0, 0, 90))):
            Circle(CROQUIS16_3_R, mode=Mode.SUBTRACT)
        with Locations(Location((-15.731324349, -4.190509634, 0), (0, 0, 90))):
            Circle(CROQUIS16_3_R, mode=Mode.SUBTRACT)
        with Locations(Location((-10.402784659, -1.354534854, 0), (0, 0, 90))):
            Circle(CROQUIS16_3_R, mode=Mode.SUBTRACT)
        with Locations(Location((-4.587176576, 0.404091135, 0), (0, 0, 90))):
            Circle(CROQUIS16_3_R, mode=Mode.SUBTRACT)
    extrude(amount=CORTAR_EXTRUIR4_DEPTH + CORTAR_EXTRUIR4_DEPTH_BACK, mode=Mode.SUBTRACT)

    # Redondeo4
    redondeo4_edges = [part.edges().sort_by_distance(p)[0] for p in [
        (1.479192938, -24.677333788, -4.678159212),
        (1.479192938, 5.322666212, -4.678159212),
        (1.479192938, -4.677333788, -4.678159212),
        (1.479192938, -14.677333788, -4.678159212),
    ]]
    fillet(redondeo4_edges, radius=REDONDEO4_R)

    # Saliente-Extruir10 outline → Saliente-Extruir10 (cut)
    with BuildSketch(Plane(origin=(0, 0, 45), x_dir=(-1, 0, 0), z_dir=(0, 0, -1)).offset(SALIENTE_EXTRUIR10_START)):
        with Locations((0, -29.797101415)):
            Rectangle(SALIENTE_EXTRUIR10_OUTLINE_W, SALIENTE_EXTRUIR10_OUTLINE_H)
    extrude(amount=SALIENTE_EXTRUIR10_DEPTH, mode=Mode.SUBTRACT)


solid = part.part
